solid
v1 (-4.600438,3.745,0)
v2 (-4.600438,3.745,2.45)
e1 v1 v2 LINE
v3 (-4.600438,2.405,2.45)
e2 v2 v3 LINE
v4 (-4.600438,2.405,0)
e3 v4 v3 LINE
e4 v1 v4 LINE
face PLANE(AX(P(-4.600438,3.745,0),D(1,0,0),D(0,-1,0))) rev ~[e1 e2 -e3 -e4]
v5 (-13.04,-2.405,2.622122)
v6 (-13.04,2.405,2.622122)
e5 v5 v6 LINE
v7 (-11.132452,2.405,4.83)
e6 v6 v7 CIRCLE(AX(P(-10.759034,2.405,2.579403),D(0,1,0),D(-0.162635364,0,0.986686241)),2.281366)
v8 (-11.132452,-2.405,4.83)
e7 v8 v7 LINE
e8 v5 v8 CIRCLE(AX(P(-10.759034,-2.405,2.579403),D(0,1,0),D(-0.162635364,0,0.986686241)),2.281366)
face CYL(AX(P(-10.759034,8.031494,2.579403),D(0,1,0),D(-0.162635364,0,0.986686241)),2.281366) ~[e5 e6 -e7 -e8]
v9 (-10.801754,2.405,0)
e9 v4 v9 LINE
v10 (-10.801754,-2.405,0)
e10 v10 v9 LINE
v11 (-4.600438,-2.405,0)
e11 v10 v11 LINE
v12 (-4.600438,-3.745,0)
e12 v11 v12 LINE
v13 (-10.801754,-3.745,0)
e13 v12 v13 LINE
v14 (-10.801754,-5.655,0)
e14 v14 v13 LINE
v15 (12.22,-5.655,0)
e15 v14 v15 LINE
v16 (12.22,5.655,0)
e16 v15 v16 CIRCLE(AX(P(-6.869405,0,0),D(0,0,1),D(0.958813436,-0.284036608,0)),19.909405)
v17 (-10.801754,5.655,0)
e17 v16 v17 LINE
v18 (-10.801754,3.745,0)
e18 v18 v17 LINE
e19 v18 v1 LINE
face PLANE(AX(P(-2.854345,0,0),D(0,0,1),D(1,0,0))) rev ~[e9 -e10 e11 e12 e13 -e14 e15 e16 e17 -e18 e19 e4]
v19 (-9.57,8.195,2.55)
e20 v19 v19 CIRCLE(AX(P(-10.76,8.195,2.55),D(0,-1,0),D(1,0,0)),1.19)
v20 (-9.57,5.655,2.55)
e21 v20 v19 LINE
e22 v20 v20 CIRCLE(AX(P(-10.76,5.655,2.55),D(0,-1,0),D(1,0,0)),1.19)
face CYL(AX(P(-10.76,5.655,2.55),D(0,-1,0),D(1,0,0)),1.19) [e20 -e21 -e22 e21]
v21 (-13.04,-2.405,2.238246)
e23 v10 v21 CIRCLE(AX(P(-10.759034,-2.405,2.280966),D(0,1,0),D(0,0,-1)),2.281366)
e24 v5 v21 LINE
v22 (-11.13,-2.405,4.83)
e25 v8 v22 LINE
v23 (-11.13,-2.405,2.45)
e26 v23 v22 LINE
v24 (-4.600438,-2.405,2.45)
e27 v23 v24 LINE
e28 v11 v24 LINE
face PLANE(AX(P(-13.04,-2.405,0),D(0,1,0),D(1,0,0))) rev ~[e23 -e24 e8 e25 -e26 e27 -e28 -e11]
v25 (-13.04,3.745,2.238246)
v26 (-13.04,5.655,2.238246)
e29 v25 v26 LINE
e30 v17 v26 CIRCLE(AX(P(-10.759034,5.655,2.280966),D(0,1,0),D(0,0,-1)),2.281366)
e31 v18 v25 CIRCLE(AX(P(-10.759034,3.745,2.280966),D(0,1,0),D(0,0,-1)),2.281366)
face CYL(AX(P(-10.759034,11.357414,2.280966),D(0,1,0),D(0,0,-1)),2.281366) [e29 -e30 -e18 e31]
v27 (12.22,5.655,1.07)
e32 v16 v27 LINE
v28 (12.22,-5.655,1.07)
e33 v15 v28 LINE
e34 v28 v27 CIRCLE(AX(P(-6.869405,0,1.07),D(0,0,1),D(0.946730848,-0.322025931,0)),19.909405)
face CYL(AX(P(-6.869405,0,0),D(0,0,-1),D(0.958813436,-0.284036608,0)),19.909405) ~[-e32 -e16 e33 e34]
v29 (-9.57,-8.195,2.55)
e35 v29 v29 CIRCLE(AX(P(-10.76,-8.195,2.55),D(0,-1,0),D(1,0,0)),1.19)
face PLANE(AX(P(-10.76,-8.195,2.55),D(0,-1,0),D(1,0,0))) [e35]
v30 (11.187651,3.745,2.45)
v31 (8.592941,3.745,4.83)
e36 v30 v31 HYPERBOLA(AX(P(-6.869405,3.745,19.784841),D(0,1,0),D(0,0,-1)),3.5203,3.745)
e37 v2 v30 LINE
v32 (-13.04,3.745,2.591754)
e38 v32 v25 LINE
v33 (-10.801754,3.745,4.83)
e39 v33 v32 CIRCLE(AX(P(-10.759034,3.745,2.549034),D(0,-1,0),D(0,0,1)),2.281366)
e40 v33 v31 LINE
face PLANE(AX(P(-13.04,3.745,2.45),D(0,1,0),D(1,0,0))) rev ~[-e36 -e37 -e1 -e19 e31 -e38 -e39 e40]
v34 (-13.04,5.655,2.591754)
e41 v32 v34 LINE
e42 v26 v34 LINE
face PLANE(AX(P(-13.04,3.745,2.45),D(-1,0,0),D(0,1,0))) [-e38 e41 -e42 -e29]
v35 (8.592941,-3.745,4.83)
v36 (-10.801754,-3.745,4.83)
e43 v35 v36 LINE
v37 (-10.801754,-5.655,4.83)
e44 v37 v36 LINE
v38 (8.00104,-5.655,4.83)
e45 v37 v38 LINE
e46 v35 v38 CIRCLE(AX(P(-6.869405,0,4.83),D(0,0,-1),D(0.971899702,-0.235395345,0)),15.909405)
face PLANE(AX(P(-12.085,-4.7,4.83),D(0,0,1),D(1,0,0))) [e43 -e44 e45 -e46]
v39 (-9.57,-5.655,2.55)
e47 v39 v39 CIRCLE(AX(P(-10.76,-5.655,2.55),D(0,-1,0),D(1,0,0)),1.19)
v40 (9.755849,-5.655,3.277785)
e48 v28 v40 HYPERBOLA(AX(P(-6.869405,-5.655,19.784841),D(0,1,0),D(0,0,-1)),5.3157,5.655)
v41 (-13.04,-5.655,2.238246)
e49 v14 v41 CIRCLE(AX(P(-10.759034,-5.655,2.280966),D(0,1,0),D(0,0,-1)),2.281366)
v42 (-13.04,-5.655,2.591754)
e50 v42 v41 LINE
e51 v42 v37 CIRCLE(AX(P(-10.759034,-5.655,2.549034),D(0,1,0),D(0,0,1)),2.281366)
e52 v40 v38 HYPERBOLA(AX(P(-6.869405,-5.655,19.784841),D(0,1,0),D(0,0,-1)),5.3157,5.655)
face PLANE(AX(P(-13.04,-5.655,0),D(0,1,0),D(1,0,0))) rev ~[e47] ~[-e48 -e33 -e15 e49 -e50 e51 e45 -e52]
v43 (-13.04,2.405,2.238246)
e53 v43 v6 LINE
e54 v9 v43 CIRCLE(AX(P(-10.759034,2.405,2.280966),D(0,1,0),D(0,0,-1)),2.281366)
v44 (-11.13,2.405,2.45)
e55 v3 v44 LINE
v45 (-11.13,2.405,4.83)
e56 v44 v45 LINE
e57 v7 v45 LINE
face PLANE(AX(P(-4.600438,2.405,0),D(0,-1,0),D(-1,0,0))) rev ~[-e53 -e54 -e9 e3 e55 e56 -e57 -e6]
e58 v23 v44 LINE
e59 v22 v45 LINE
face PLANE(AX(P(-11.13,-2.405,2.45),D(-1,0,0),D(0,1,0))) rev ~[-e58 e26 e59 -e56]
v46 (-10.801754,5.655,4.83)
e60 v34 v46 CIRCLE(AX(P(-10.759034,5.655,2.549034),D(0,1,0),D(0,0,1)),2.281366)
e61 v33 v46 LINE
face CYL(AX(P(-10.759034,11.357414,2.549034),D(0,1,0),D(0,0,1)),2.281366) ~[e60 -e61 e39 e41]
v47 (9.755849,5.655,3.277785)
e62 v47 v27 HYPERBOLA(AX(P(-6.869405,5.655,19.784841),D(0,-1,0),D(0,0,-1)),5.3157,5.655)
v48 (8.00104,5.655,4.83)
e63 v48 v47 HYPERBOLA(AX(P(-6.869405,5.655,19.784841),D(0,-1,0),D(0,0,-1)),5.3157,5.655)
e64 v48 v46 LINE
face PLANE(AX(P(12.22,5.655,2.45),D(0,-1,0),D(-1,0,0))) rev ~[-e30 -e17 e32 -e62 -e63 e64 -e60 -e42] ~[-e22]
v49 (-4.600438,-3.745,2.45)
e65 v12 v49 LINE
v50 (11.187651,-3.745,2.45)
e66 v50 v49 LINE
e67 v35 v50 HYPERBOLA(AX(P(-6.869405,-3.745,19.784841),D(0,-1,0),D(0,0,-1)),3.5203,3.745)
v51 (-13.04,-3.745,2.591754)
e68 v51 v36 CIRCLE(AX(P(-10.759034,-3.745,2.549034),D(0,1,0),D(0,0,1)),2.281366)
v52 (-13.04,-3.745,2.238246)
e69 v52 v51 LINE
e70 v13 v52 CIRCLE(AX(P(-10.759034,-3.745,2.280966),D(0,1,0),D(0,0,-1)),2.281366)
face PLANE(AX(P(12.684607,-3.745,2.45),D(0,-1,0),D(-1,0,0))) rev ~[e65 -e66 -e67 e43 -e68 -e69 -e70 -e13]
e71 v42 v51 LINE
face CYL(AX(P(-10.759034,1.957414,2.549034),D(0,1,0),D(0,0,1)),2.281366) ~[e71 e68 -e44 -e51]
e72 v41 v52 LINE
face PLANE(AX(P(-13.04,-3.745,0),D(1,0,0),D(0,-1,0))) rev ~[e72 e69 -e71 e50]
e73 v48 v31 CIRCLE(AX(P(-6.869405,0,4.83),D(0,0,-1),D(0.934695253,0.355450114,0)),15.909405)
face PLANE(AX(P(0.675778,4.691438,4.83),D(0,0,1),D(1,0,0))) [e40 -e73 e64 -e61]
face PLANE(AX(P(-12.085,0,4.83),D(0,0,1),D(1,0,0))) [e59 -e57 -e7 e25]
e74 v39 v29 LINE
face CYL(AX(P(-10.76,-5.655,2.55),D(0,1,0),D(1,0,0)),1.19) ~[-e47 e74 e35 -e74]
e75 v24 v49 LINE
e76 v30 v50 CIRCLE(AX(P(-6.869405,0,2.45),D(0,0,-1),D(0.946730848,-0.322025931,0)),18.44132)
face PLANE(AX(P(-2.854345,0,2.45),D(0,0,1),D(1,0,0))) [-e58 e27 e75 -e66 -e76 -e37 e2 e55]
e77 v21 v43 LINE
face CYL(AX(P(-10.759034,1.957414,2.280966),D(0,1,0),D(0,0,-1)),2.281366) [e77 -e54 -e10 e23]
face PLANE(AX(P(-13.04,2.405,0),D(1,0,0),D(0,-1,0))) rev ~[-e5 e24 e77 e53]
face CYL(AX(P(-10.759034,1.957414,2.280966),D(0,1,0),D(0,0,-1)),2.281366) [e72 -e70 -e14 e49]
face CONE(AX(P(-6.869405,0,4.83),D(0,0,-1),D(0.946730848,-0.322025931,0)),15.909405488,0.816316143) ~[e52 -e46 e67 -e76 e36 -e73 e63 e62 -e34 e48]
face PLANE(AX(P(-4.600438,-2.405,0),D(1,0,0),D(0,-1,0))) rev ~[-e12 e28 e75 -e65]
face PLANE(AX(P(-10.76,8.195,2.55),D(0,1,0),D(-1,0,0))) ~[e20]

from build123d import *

# Parameters (mm, degrees)
F1_DEPTH     = 2.45
F2_W         = 1.91
F2_H         = 1.91
F2_H_2       = 4.81
F3_DEPTH     = 2.38
F4_T1_DEPTH  = 13.3148286025
F4_T3_DEPTH  = 7.6124143012
F4_T5_DEPTH  = 13.3148286025
F4_T7_DEPTH  = 16.0629874681
F4_T9_DEPTH  = 16.2148286025
F4_T14_DEPTH = 13.3148286025
F5_T2_ANGLE  = 64.9142912697
F5_T4_ANGLE  = 64.9142912697
F6_R         = 1.19
F7_DEPTH     = 2.54


# Not quite as in the source:
# - a fillet or chamfer that OpenCascade refuses, or shapes differently, is made with other operations: its cross-section is extruded or revolved along the edge and cut away or added


with BuildPart() as f1:
    # F0 (on Top) → F1 (new body)
    with BuildSketch(Plane.XY):
        Polygon((12.22, -5.655), (12.22, 5.655), (-7.02, 5.655), (-9.51, 5.655), (-13.04, 5.655), (-13.04, 3.745), (-4.6004378237, 3.745), (-4.6004378237, 2.405), (-13.04, 2.405), (-13.04, -2.405), (-4.6004378237, -2.405), (-4.6004378237, -3.745), (-13.04, -3.745), (-13.04, -5.655), (-9.51, -5.655), (-7.02, -5.655), align=None)
        with BuildLine():
            ThreePointArc((12.22, -5.655), (13.04, 0), (12.22, 5.655))
            Line((12.22, 5.655), (12.22, -5.655))
        make_face()
    extrude(amount=F1_DEPTH)

    # F2 (on face) → F3 (join)
    with BuildSketch(Plane.XY.offset(2.45)):
        with BuildLine():
            ThreePointArc((12.6846069362, 3.745), (12.4758901154, 4.705737445), (12.22, 5.655))
            Line((12.22, 5.655), (-11.13, 5.655))
            Line((-11.13, 5.655), (-11.13, 3.745))
            Line((-11.13, 3.745), (-4.6004378237, 3.745))
            Line((-4.6004378237, 3.745), (12.6846069362, 3.745))
        make_face()
        with Locations((-12.085, 4.7)):
            Rectangle(F2_W, F2_H)
        with Locations((-12.085, 0)):
            Rectangle(F2_W, F2_H_2)
        with Locations((-12.085, -4.7)):
            Rectangle(F2_W, F2_H)
        with BuildLine():
            ThreePointArc((12.22, -5.655), (12.4758901154, -4.705737445), (12.6846069362, -3.745))
            Line((12.6846069362, -3.745), (-4.6004378237, -3.745))
            Line((-4.6004378237, -3.745), (-11.13, -3.745))
            Line((-11.13, -3.745), (-11.13, -5.655))
            Line((-11.13, -5.655), (12.22, -5.655))
        make_face()
    extrude(amount=F3_DEPTH)

    # F4: fillet of radius 2.28 on 6 edges, made by hand

    # F4_s2 → F4_t1 (cut)
    with BuildSketch(Plane.XZ.offset(-1.9574143012)):
        with BuildLine():
            ThreePointArc((-10.7590343146, -0.0004), (-12.3722034611, 0.6677965389), (-13.0404, 2.2809656854))
            Line((-13.0404, 2.2809656854), (-13.2685365685, 2.2809656854))
            ThreePointArc((-13.2685365685, 2.2809656854), (-13.2681365685, 1.1404828427), (-13.2681365685, 0))
            Line((-13.2681365685, 0), (-13.04, -0.2281365685))
            ThreePointArc((-13.04, -0.2281365685), (-11.8995171573, -0.2281365685), (-10.7590343146, -0.2285365685))
            Line((-10.7590343146, -0.2285365685), (-10.7590343146, -0.0004))
        make_face()
    extrude(amount=F4_T1_DEPTH, mode=Mode.SUBTRACT)

    # F4_s4 → F4_t3 (cut)
    with BuildSketch(Plane.XZ.offset(-11.3574143012)):
        with BuildLine():
            ThreePointArc((-10.7590343146, 4.8304), (-12.3722034611, 4.1622034611), (-13.0404, 2.5490343146))
            Line((-13.0404, 2.5490343146), (-13.2685365685, 2.5490343146))
            ThreePointArc((-13.2685365685, 2.5490343146), (-13.2681365685, 3.6895171573), (-13.2681365685, 4.83))
            Line((-13.2681365685, 4.83), (-13.04, 5.0581365685))
            ThreePointArc((-13.04, 5.0581365685), (-11.8995171573, 5.0581365685), (-10.7590343146, 5.0585365685))
            Line((-10.7590343146, 5.0585365685), (-10.7590343146, 4.8304))
        make_face()
    extrude(amount=F4_T3_DEPTH, mode=Mode.SUBTRACT)

    # F4_s6 → F4_t5 (cut)
    with BuildSketch(Plane.XZ.offset(-11.3574143012)):
        with BuildLine():
            ThreePointArc((-10.7590343146, -0.0004), (-12.3722034611, 0.6677965389), (-13.0404, 2.2809656854))
            Line((-13.0404, 2.2809656854), (-13.2685365685, 2.2809656854))
            ThreePointArc((-13.2685365685, 2.2809656854), (-13.2681365685, 1.1404828427), (-13.2681365685, 0))
            Line((-13.2681365685, 0), (-13.04, -0.2281365685))
            ThreePointArc((-13.04, -0.2281365685), (-11.8995171573, -0.2281365685), (-10.7590343146, -0.2285365685))
            Line((-10.7590343146, -0.2285365685), (-10.7590343146, -0.0004))
        make_face()
    extrude(amount=F4_T5_DEPTH, mode=Mode.SUBTRACT)

    # F4_s8 → F4_t7 (cut)
    with BuildSketch(Plane.XZ.offset(-8.0314937341)):
        with BuildLine():
            ThreePointArc((-11.1300650541, 4.8303946745), (-12.4984431492, 4.0555753965), (-13.0404, 2.5794025419))
            Line((-13.0404, 2.5794025419), (-13.2685365685, 2.5794025419))
            ThreePointArc((-13.2685365685, 2.5794025419), (-13.2681365685, 3.704701271), (-13.2681365685, 4.83))
            Line((-13.2681365685, 4.83), (-13.04, 5.0581365685))
            ThreePointArc((-13.04, 5.0581365685), (-12.0850325271, 5.0581365685), (-11.1671681281, 5.0554938878))
            Line((-11.1671681281, 5.0554938878), (-11.1300650541, 4.8303946745))
        make_face()
    extrude(amount=F4_T7_DEPTH, mode=Mode.SUBTRACT)

    # F4_s10 → F4_t9 (cut)
    with BuildSketch(Plane.XZ.offset(-8.1074143012)):
        with BuildLine():
            ThreePointArc((-10.7590343146, -0.0004), (-12.3722034611, 0.6677965389), (-13.0404, 2.2809656854))
            Line((-13.0404, 2.2809656854), (-13.2685365685, 2.2809656854))
            ThreePointArc((-13.2685365685, 2.2809656854), (-13.2681365685, 1.1404828427), (-13.2681365685, 0))
            Line((-13.2681365685, 0), (-13.04, -0.2281365685))
            ThreePointArc((-13.04, -0.2281365685), (-11.8995171573, -0.2281365685), (-10.7590343146, -0.2285365685))
            Line((-10.7590343146, -0.2285365685), (-10.7590343146, -0.0004))
        make_face()
    extrude(amount=F4_T9_DEPTH, mode=Mode.SUBTRACT)


with BuildPart() as f4_tool12:
    # F4_s13 → F4_t14 (new body)
    with BuildSketch(Plane.XZ.offset(-1.9574143012)):
        with BuildLine():
            ThreePointArc((-10.7590343146, 4.8304), (-12.3722034611, 4.1622034611), (-13.0404, 2.5490343146))
            Line((-13.0404, 2.5490343146), (-13.2685365685, 2.5490343146))
            ThreePointArc((-13.2685365685, 2.5490343146), (-13.2681365685, 3.6895171573), (-13.2681365685, 4.83))
            Line((-13.2681365685, 4.83), (-13.04, 5.0581365685))
            ThreePointArc((-13.04, 5.0581365685), (-11.8995171573, 5.0581365685), (-10.7590343146, 5.0585365685))
            Line((-10.7590343146, 5.0585365685), (-10.7590343146, 4.8304))
        make_face()
    extrude(amount=F4_T14_DEPTH)

    split(bisect_by=Plane.XZ.offset(2.405), keep=Keep.TOP)


with BuildPart() as f1_1:
    add(f1.part)

    # F4_t11: cut F4_tool12
    add(f4_tool12.part, mode=Mode.SUBTRACT)

    # F5: chamfer of 4 x 3.76 on 2 edges, made by hand

    # F5_s1 → F5_t2 (revolve, cut)
    with BuildSketch(Plane(origin=(-0.7123621612, -2.0942885882, 0), x_dir=(0, 0, 1), z_dir=(-0.3220259314, -0.9467308485, 0))):
        Polygon((4.83, -9.4059274017), (1.07, -13.4059274017), (4.83, -13.4059274017), align=None)
    revolve(axis=Axis((-6.8694054878, 0, 4.83), (0, 0, 1)), revolution_arc=F5_T2_ANGLE, mode=Mode.SUBTRACT)

    # F5_s3 → F5_t4 (revolve, cut)
    with BuildSketch(Plane(origin=(-3.5700040609, -3.4320367849, 0), x_dir=(0, 0, 1), z_dir=(-0.7208995903, -0.6930395232, 0))):
        Polygon((4.83, -11.148635984), (1.07, -15.148635984), (4.83, -15.148635984), align=None)
    revolve(axis=Axis((-6.8694054878, 0, 4.83), (0, 0, 1)), revolution_arc=F5_T4_ANGLE, mode=Mode.SUBTRACT)

    # F6 (on face) → F7 (join)
    with BuildSketch(Plane.XZ.offset(5.655)):
        with Locations((-10.76, 2.55)):
            Circle(F6_R)
    extrude(amount=F7_DEPTH)

    # F8: F1 across plane


with BuildPart() as f1_2:
    add(f1_1.part)
    add(f1_1.part.mirror(Plane.XZ))


solid = f1_2.part
